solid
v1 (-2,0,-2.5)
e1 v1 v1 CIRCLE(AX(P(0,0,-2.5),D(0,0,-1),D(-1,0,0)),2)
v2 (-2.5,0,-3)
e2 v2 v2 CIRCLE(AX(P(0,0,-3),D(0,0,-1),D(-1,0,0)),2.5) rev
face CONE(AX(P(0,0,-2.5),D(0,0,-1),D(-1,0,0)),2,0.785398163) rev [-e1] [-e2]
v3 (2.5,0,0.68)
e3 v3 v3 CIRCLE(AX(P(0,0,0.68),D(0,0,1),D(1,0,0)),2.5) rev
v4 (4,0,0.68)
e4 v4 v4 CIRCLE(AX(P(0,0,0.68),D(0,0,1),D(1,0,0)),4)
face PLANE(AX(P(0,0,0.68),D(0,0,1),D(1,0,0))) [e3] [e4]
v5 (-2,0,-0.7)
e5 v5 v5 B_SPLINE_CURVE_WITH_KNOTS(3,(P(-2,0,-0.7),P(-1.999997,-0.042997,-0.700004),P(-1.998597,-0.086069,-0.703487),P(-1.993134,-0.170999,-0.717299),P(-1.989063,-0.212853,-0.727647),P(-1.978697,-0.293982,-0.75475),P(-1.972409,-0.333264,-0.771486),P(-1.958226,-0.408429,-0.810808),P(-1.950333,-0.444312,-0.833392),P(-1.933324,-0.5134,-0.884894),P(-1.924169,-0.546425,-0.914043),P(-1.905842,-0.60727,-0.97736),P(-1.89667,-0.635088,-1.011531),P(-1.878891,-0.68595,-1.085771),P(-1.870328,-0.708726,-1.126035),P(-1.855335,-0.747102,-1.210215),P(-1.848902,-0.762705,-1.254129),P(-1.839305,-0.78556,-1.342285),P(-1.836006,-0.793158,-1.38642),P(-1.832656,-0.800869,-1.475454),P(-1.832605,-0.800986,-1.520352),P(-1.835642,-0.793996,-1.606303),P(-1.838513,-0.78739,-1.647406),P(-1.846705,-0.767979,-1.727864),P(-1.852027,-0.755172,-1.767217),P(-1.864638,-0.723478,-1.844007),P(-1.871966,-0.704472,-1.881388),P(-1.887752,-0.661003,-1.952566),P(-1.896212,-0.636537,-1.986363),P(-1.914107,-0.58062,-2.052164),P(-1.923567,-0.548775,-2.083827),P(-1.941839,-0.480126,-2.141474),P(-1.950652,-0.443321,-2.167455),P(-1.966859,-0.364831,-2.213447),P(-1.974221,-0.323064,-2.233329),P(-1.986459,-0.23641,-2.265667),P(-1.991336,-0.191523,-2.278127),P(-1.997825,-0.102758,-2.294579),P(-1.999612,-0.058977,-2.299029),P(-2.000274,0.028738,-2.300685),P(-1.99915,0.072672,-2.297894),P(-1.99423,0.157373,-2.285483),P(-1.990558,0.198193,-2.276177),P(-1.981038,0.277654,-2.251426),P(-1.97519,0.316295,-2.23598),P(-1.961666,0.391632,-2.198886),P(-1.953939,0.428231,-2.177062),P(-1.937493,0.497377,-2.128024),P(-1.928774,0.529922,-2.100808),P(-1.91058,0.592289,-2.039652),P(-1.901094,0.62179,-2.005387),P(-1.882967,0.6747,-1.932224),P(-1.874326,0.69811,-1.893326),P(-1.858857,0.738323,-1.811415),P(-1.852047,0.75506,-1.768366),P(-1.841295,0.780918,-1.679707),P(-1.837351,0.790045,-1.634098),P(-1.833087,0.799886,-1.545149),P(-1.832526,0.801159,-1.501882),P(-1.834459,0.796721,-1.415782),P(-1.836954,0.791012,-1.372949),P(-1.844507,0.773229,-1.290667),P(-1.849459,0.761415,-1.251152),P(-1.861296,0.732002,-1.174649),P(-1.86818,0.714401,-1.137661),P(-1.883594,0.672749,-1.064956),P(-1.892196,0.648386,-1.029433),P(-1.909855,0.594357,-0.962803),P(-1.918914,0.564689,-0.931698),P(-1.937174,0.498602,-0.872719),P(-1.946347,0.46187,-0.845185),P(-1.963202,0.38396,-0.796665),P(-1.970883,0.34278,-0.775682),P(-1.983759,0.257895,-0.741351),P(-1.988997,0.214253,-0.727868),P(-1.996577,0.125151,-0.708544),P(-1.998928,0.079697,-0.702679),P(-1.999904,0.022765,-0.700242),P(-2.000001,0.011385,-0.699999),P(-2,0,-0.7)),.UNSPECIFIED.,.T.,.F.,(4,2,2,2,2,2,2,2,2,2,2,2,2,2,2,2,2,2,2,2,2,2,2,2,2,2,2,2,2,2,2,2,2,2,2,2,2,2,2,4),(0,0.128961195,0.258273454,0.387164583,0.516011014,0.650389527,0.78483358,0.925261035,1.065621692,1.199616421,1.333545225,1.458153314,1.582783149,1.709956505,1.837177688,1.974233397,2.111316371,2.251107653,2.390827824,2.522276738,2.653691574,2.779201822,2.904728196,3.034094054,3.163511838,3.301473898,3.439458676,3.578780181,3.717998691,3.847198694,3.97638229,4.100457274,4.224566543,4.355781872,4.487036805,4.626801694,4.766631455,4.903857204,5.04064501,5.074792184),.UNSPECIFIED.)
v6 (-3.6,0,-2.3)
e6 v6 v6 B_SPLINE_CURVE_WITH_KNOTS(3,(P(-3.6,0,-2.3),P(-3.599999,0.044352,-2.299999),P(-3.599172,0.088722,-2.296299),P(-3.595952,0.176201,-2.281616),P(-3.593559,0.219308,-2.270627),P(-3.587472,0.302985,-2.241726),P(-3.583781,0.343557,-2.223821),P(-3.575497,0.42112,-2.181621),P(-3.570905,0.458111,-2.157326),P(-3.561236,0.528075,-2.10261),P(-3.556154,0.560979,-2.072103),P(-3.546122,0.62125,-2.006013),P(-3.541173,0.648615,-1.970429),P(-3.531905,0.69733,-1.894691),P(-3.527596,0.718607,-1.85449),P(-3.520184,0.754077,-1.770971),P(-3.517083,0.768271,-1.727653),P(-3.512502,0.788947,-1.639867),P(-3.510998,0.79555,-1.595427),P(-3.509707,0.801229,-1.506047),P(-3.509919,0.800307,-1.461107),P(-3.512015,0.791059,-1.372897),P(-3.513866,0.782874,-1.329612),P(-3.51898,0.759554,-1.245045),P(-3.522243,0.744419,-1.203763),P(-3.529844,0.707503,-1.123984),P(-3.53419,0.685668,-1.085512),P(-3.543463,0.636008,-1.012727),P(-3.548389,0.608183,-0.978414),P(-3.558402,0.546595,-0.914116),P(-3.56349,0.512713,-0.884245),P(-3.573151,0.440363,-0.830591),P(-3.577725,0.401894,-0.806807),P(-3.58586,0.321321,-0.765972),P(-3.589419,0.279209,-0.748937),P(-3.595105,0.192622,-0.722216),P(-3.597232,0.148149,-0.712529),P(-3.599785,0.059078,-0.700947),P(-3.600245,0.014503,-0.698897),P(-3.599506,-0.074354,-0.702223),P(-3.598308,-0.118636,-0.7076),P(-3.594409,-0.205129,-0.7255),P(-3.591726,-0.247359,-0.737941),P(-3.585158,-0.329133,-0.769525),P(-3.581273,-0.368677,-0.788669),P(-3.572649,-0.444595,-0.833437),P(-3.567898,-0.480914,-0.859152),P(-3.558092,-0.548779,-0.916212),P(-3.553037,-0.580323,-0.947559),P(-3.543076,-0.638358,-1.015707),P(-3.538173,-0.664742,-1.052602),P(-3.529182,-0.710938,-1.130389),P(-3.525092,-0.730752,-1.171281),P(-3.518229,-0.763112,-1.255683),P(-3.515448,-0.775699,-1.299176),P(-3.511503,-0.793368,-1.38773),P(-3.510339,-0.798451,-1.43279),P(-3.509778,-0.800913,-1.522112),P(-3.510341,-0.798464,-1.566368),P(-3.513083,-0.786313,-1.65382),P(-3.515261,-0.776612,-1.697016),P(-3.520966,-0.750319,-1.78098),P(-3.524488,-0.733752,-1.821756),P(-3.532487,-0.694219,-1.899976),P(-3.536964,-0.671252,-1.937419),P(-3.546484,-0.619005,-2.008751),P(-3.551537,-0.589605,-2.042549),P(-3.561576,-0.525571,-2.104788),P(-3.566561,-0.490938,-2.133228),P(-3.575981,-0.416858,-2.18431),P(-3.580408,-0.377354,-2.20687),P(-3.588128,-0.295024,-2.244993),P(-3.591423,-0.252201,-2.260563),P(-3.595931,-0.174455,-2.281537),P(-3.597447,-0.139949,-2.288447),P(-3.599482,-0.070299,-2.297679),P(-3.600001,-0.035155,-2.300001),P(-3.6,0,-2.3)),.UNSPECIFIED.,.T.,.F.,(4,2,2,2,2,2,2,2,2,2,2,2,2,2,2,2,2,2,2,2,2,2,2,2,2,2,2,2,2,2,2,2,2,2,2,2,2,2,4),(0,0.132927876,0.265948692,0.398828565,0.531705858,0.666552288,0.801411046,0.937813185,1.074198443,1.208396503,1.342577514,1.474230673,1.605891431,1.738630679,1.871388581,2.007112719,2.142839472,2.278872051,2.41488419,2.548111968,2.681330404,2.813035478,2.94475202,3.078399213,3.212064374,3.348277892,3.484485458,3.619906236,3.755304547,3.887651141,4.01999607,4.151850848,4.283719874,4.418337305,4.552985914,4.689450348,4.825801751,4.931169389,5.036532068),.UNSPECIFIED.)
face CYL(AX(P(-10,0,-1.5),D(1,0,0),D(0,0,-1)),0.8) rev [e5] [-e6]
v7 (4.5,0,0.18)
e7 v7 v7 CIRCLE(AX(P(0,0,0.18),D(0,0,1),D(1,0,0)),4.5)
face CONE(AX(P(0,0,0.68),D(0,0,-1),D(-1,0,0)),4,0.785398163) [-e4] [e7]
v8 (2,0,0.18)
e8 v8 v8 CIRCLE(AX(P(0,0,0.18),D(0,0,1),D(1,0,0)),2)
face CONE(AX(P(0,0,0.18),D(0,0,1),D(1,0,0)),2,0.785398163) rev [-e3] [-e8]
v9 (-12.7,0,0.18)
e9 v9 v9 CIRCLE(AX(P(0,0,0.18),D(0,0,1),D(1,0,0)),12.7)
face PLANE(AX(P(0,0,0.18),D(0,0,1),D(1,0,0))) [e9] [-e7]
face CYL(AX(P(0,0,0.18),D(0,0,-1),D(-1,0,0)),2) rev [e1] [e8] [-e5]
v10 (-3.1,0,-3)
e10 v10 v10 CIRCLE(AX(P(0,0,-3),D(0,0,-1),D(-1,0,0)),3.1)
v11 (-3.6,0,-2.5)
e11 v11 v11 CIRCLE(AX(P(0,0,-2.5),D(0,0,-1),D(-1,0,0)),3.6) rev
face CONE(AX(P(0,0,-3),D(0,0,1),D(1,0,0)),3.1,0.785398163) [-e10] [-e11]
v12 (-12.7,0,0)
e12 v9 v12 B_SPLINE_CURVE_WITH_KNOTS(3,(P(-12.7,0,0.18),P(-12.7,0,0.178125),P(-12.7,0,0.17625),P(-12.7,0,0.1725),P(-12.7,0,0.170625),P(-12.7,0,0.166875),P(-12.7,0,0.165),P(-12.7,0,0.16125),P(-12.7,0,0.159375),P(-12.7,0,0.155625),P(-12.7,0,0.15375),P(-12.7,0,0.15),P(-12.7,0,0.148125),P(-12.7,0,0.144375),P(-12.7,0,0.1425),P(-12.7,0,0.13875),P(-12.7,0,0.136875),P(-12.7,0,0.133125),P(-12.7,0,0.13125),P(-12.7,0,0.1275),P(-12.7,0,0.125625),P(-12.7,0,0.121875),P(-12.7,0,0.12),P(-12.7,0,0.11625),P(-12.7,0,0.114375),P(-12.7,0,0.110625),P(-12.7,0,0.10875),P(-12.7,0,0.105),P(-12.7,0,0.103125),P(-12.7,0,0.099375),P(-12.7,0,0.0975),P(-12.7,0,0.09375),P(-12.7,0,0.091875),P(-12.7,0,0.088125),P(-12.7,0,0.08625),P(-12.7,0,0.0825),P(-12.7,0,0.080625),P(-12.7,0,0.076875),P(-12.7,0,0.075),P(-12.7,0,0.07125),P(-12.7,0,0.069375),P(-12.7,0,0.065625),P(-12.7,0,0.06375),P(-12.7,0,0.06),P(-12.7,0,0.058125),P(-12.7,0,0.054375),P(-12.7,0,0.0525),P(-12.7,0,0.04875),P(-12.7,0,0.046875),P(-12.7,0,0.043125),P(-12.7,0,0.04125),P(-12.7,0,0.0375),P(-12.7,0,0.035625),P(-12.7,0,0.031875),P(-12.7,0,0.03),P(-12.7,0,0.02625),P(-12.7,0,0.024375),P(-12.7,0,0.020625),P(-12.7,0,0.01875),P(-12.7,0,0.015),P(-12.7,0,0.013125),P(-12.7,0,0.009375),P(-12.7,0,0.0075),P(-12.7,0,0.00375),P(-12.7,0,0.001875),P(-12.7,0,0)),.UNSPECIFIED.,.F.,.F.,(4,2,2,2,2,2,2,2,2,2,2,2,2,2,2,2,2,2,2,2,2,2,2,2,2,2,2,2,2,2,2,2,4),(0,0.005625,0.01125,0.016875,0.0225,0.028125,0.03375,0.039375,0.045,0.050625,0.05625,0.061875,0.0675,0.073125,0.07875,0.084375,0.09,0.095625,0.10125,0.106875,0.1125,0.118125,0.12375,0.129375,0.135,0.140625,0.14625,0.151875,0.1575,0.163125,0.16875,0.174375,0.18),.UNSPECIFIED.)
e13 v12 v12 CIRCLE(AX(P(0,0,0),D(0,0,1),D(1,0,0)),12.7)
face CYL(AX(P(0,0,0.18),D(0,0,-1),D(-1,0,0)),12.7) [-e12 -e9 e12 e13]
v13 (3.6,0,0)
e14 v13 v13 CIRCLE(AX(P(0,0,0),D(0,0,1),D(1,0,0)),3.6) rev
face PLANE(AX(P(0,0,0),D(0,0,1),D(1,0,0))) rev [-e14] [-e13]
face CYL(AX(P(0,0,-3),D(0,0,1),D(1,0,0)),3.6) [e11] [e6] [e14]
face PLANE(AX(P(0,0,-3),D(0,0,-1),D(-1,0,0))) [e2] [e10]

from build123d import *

# Parameters (mm, degrees)
SKETCH_1_R          = 12.7
SKETCH_1_R_2        = 2
EXTRUDE_1_DEPTH     = 0.18
EXTRUDE_START       = 3
SKETCH_2_R          = 3.6
SKETCH_2_R_2        = 2
EXTRUDE_2_DEPTH     = 3
SKETCH_3_R          = 0.8
CUT_EXTRUDE_1_DEPTH = 10
CHAMFER_1_SIZE      = 0.5
SKETCH_4_R          = 4.5
SKETCH_4_R_2        = 2
EXTRUDE_3_DEPTH     = 0.5
CHAMFER_2_SIZE      = 0.5
CHAMFER_3_SIZE      = 0.5


with BuildPart() as part:
    # 草图1 → 凸台-拉伸1 (new body)
    with BuildSketch(Plane.XY):
        with Locations(Location((0, 0, 0), (0, 0, 180))):
            Circle(SKETCH_1_R)
        with Locations(Location((0, 0, 0), (0, 0, 180))):
            Circle(SKETCH_1_R_2, mode=Mode.SUBTRACT)
    extrude(amount=EXTRUDE_1_DEPTH)

    # 草图2 → 凸台-拉伸2 (add)
    with BuildSketch(Plane(origin=(0, 0, 0), x_dir=(-1, 0, 0), z_dir=(0, 0, -1)).offset(EXTRUDE_START)):
        with Locations(Location((0, 0, 0), (0, 0, 180))):
            Circle(SKETCH_2_R)
        Circle(SKETCH_2_R_2, mode=Mode.SUBTRACT)
    extrude(amount=-EXTRUDE_2_DEPTH)

    # 草图3 → 切除-拉伸1 (cut)
    with BuildSketch(Plane(origin=(0, 0, 0), x_dir=(0, 0, -1), z_dir=(1, 0, 0))):
        with Locations((1.5, 0)):
            Circle(SKETCH_3_R)
    extrude(amount=-CUT_EXTRUDE_1_DEPTH, mode=Mode.SUBTRACT)

    # 倒角1
    chamfer_1_edges = [part.edges().sort_by_distance(p)[0] for p in [
        (-3.6, 0, -3),
        (2, 0, -3),
    ]]
    chamfer(chamfer_1_edges, length=CHAMFER_1_SIZE)

    # 草图4 → 凸台-拉伸3 (add)
    with BuildSketch(Plane.XY.offset(0.18)):
        Circle(SKETCH_4_R)
        with Locations(Location((0, 0, 0), (0, 0, 180))):
            Circle(SKETCH_4_R_2, mode=Mode.SUBTRACT)
    extrude(amount=EXTRUDE_3_DEPTH)

    # 倒角2
    chamfer_2_edges = [part.edges().sort_by_distance(p)[0] for p in [
        (-4.5, 0, 0.68),
    ]]
    chamfer(chamfer_2_edges, length=CHAMFER_2_SIZE - 0.0001)  # a hair under: the kernel refuses the full size

    # 倒角3
    chamfer_3_edges = [part.edges().sort_by_distance(p)[0] for p in [
        (2, 0, 0.68),
    ]]
    chamfer(chamfer_3_edges, length=CHAMFER_3_SIZE)


solid = part.part
